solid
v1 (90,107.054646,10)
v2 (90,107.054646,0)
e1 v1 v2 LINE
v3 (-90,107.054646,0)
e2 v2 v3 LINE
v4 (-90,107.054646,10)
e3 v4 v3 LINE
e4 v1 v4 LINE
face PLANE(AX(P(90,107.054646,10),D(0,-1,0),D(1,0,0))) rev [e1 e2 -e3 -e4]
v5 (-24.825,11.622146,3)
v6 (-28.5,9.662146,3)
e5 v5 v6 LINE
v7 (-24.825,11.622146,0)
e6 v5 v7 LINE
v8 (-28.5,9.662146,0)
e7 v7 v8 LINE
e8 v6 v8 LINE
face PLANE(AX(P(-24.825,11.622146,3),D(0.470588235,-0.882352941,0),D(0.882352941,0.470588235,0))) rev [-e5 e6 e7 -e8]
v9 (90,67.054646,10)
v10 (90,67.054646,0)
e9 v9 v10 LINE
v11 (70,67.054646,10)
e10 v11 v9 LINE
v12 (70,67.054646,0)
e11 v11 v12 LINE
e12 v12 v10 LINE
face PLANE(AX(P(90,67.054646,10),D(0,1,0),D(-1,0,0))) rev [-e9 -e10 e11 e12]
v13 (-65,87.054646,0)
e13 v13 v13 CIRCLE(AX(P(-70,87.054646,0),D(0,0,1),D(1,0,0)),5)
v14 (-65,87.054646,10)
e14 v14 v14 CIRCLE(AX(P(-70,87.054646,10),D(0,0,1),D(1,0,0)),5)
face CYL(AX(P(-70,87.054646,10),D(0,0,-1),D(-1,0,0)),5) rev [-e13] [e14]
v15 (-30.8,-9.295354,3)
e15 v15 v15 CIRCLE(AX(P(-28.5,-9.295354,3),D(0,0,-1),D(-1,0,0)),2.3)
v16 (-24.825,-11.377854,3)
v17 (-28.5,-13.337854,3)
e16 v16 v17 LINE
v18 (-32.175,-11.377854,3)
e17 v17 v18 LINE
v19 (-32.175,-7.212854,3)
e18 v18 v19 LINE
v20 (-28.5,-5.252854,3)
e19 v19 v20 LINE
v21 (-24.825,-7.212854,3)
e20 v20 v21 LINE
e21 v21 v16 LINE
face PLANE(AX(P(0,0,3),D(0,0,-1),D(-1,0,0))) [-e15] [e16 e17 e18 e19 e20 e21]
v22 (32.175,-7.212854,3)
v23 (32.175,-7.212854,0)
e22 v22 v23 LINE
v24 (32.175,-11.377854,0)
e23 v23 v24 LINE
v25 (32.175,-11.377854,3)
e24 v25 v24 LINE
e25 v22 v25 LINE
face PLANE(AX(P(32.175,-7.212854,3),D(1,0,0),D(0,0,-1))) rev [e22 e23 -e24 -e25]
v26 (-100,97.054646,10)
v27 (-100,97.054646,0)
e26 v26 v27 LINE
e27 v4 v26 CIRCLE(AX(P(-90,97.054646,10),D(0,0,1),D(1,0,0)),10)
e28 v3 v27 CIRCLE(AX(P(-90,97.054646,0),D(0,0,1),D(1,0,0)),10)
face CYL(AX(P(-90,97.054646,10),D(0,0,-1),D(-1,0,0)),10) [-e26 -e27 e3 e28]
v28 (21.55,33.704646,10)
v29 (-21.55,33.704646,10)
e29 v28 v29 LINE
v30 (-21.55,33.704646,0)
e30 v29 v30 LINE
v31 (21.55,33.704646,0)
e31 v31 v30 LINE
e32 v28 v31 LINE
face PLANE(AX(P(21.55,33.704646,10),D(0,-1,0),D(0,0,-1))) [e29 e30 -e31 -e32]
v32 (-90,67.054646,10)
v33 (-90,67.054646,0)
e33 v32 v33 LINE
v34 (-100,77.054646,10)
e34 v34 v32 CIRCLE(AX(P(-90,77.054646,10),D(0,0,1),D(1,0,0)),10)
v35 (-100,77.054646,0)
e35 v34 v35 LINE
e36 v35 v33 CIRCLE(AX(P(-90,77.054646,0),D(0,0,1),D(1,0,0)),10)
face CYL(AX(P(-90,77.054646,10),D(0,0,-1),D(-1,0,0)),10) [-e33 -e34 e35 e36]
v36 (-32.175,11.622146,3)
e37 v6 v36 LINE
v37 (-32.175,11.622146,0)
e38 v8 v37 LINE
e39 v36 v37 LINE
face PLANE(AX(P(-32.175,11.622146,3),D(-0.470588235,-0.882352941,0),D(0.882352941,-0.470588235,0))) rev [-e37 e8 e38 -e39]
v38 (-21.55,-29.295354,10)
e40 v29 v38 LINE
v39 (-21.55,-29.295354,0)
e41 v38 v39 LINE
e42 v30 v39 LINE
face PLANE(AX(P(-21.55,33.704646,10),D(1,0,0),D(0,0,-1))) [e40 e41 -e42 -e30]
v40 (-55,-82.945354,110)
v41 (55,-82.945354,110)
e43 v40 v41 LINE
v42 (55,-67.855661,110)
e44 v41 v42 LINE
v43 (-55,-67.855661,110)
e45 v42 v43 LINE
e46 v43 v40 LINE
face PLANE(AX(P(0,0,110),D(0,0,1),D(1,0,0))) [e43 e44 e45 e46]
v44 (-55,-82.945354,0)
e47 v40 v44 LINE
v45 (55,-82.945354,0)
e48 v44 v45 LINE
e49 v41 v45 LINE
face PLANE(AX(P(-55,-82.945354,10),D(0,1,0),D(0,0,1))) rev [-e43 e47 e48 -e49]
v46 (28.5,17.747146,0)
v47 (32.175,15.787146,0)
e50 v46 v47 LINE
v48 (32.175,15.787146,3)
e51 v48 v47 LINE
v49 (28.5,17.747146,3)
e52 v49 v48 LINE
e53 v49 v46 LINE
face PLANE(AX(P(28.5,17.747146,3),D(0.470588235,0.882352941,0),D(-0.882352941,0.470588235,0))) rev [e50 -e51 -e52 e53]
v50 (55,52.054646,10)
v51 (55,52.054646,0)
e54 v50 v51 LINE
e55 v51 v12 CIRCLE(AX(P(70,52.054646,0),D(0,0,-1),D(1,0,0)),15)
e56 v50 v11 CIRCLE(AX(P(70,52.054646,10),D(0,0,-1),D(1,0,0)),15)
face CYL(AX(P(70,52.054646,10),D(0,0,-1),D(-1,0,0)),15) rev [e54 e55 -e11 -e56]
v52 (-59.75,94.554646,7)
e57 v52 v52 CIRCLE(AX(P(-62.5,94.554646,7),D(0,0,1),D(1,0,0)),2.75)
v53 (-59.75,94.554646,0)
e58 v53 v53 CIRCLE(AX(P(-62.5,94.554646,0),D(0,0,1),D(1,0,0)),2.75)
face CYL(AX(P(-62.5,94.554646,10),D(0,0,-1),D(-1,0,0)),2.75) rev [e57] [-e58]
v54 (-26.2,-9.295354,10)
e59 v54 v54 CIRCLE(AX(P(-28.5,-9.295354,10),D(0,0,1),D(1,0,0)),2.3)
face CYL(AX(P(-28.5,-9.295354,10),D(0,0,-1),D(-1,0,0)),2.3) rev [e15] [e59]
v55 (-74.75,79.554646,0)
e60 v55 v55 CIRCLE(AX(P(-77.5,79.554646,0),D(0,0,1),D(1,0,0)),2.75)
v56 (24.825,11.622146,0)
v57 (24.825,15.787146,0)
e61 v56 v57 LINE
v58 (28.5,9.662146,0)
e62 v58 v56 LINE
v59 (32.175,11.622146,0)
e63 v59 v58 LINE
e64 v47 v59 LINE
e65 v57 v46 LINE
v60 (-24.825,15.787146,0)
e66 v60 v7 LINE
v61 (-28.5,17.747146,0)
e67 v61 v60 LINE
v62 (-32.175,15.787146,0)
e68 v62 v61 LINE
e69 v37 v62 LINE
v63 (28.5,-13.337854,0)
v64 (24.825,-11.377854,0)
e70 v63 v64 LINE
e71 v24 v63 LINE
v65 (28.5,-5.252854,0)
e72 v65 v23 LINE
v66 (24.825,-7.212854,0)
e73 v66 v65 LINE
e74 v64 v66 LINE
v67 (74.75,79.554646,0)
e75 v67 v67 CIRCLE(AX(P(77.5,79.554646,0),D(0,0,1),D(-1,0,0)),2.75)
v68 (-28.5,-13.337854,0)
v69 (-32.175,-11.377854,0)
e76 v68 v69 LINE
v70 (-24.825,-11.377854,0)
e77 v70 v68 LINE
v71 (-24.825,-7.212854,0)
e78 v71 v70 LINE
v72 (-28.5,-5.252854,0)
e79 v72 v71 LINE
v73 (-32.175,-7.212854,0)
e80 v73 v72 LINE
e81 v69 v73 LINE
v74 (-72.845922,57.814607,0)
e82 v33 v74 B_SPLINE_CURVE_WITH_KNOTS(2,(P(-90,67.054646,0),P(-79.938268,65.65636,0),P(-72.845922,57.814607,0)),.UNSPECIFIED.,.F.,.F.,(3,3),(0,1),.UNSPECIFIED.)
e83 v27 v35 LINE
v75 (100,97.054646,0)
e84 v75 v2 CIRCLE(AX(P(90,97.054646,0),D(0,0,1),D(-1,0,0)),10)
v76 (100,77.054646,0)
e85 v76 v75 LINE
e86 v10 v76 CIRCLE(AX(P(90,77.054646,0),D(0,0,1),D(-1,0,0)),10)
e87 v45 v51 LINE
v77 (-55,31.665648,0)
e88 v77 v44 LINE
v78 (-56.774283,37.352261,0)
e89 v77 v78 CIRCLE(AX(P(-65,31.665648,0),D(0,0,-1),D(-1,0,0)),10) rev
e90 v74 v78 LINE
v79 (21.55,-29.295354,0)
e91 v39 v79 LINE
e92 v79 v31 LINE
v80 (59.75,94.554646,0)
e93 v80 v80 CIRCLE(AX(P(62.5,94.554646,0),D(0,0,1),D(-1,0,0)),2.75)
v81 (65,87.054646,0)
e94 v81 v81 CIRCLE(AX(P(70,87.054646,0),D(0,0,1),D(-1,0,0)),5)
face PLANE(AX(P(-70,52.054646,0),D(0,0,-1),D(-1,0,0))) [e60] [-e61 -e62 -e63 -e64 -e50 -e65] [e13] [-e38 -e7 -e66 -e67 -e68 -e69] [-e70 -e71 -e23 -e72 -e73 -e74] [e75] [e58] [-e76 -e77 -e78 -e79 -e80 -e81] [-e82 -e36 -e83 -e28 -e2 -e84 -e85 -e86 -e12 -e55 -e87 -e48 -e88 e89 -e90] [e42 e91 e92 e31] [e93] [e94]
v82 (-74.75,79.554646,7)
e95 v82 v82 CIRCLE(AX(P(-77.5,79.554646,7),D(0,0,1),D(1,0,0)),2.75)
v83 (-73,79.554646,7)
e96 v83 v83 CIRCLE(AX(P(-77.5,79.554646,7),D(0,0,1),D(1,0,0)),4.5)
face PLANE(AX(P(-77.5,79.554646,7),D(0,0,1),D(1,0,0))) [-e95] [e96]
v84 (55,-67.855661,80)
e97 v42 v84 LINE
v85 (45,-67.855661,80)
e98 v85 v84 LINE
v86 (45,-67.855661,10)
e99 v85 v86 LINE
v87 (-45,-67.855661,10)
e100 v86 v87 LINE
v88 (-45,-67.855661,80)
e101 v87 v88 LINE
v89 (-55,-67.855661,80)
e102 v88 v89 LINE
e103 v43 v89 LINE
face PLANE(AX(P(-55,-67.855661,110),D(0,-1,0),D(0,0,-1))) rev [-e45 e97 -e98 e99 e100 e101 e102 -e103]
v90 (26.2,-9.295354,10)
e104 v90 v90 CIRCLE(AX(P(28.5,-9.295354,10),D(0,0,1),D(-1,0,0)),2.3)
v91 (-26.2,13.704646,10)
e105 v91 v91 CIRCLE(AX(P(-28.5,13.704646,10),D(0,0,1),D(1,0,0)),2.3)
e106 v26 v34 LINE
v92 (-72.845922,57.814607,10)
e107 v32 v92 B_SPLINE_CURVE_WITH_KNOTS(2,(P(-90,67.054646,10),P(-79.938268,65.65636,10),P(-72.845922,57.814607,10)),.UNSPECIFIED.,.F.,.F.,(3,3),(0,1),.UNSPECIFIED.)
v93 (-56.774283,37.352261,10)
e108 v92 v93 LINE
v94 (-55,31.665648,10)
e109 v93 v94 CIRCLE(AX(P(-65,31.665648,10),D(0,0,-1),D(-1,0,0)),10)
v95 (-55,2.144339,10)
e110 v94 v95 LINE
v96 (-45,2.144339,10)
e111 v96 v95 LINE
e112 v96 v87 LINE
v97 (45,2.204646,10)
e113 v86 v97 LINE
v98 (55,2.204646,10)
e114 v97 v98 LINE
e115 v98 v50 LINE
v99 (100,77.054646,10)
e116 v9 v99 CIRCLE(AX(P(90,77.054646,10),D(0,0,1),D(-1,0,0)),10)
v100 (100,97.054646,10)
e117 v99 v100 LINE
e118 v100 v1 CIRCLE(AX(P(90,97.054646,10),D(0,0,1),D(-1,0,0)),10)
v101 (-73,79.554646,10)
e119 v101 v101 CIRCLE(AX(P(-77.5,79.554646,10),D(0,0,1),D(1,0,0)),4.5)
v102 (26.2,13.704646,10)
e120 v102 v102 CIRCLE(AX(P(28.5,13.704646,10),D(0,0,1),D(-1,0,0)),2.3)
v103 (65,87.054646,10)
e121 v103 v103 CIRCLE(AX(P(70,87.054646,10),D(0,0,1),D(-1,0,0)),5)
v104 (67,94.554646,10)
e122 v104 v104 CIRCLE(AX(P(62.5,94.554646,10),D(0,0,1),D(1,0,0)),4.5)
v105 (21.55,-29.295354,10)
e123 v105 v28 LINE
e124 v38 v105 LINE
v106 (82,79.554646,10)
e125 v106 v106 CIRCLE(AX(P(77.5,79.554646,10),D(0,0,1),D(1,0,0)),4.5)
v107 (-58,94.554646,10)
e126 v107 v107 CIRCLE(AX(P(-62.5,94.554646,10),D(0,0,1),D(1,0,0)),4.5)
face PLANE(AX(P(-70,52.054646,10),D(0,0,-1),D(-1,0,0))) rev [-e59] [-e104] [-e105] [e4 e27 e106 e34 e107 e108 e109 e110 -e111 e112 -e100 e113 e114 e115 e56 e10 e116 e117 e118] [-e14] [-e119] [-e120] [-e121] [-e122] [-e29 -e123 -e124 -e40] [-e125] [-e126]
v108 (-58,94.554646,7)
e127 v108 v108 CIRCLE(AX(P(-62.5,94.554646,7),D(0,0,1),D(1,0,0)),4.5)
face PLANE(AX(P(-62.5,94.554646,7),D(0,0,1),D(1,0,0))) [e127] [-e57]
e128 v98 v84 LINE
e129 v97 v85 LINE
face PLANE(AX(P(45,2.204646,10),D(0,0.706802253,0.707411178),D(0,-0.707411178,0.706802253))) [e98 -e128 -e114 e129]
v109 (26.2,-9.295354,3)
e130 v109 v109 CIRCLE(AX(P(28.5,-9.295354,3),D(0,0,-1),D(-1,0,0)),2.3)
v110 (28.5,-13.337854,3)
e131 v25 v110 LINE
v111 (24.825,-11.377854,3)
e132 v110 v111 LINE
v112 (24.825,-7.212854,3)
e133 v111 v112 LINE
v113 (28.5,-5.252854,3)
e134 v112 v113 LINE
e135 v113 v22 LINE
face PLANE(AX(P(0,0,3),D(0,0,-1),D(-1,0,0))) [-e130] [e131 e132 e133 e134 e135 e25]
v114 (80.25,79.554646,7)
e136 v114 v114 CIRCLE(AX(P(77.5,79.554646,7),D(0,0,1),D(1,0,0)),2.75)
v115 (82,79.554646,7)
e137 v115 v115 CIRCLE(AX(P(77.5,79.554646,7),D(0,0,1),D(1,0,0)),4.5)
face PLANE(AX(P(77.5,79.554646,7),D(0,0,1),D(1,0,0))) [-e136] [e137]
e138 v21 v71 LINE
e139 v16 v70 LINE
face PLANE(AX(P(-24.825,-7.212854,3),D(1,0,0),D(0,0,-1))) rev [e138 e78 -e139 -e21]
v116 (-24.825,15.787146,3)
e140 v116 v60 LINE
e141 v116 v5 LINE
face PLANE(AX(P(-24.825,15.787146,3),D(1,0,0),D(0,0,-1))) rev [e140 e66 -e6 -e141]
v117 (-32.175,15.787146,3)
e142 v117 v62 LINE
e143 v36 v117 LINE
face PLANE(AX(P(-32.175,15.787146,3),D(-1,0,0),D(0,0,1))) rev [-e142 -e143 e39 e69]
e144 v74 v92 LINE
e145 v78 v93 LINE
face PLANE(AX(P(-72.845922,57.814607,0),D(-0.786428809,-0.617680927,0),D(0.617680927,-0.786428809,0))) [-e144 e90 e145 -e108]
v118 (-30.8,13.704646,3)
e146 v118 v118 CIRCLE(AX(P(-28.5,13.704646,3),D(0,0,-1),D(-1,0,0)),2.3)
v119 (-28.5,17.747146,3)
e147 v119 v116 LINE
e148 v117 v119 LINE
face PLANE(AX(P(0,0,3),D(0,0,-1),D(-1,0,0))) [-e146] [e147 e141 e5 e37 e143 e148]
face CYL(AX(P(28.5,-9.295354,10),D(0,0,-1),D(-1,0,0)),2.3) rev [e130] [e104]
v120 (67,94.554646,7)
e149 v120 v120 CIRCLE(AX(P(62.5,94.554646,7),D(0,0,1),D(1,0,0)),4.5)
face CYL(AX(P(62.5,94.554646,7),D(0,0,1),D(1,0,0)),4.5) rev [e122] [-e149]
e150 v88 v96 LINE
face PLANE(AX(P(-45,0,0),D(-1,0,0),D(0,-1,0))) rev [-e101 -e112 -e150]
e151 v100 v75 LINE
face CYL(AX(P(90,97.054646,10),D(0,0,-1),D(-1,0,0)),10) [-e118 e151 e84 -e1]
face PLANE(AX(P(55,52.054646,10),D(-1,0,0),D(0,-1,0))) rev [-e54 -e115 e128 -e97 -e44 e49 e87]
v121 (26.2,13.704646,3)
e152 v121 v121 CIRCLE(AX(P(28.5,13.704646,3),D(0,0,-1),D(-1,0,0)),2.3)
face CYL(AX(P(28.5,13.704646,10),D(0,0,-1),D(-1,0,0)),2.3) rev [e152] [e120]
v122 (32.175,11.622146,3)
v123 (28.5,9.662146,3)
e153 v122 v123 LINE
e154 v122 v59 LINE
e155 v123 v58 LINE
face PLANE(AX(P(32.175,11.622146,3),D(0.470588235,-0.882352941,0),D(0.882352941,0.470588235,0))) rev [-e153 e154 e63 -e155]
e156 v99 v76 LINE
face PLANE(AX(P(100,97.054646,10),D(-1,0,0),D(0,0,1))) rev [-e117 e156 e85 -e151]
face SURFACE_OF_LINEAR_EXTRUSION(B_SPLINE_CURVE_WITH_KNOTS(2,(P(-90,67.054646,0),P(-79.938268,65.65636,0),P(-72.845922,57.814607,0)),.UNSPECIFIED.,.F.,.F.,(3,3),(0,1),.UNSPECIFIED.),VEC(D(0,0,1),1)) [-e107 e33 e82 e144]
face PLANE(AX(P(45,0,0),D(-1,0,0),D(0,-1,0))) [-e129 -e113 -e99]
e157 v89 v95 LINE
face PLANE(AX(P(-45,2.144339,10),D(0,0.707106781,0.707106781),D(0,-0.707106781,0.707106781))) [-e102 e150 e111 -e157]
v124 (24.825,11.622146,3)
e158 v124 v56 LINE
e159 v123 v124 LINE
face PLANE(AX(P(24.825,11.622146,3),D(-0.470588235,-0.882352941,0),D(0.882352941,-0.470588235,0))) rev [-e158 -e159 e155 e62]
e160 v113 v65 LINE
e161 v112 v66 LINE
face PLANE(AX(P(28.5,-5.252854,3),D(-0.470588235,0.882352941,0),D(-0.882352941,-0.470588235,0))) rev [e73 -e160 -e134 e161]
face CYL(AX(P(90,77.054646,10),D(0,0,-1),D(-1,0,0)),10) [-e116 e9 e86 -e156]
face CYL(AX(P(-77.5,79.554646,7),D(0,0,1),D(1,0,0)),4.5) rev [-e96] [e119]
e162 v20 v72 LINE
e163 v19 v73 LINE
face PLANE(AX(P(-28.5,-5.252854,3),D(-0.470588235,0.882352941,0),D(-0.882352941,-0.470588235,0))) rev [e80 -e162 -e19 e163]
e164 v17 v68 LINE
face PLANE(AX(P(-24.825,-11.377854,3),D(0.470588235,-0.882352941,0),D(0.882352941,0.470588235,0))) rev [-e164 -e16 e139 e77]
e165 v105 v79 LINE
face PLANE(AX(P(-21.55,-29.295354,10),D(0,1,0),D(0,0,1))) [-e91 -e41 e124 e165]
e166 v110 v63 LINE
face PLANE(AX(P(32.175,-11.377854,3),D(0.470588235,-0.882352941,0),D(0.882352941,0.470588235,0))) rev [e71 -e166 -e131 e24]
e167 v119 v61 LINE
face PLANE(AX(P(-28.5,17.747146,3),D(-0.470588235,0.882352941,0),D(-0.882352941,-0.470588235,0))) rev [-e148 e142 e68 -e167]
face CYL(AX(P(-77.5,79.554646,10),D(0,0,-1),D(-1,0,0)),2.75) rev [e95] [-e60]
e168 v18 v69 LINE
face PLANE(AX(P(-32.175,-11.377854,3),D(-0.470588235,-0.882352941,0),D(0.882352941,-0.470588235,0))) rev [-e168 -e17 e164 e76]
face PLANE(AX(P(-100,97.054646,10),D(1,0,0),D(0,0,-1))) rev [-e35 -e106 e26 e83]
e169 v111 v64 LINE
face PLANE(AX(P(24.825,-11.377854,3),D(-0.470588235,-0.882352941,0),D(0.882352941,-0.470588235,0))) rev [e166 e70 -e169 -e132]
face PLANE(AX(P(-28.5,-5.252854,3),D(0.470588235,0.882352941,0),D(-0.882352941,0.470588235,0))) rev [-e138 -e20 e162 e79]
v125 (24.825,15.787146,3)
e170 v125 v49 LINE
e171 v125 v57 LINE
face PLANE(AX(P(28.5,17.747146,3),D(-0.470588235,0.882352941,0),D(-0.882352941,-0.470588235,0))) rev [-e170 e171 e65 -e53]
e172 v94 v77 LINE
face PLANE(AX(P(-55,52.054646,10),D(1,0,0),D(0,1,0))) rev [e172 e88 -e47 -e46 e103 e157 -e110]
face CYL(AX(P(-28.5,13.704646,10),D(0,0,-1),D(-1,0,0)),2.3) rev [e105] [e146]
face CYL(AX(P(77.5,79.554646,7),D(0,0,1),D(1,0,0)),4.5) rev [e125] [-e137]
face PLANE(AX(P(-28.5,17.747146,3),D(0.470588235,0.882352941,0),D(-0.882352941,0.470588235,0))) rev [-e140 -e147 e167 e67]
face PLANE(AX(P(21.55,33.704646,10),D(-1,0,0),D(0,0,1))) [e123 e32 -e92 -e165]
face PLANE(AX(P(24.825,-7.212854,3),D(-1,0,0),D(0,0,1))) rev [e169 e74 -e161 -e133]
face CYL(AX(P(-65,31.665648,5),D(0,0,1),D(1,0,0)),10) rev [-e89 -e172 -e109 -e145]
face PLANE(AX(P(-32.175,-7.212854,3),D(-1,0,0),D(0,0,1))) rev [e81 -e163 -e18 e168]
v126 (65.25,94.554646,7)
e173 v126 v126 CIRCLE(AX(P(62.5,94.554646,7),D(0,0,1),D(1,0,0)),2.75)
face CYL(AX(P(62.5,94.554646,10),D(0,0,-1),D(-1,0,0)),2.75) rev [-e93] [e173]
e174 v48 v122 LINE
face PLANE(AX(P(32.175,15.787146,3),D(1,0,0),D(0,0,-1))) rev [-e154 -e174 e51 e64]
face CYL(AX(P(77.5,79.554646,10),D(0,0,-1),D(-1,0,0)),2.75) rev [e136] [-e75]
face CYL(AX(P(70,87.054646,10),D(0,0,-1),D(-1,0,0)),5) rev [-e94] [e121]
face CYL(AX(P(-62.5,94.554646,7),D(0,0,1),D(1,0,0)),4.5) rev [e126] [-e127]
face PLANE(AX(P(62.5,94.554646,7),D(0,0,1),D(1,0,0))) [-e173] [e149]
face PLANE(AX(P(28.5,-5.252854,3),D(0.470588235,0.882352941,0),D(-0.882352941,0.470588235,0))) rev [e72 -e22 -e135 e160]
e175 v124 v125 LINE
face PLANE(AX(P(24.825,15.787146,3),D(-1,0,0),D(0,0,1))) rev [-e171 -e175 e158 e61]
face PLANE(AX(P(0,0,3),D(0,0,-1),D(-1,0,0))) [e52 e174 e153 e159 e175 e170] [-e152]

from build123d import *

# Parameters (mm, degrees)
SKIZZE1_R                       = 2.3
SKIZZE1_R_2                     = 5
SKIZZE1_R_3                     = 2.75
SKIZZE1_W                       = 43.1
SKIZZE1_H                       = 63
AUFSATZ_LINEAR_AUSTRAGEN1_DEPTH = 10
AUFSATZ_LINEAR_AUSTRAGEN3_DEPTH = 10
SKIZZE4_W                       = 110
SKIZZE4_H                       = 15.089693508
AUFSATZ_LINEAR_AUSTRAGEN4_DEPTH = 100
VERRUNDUNG5_R                   = 10
SKIZZE11_R                      = 4.5
SCHNITT_LINEAR_AUSTRAGEN1_DEPTH = 3
SCHNITT_LINEAR_AUSTRAGEN2_DEPTH = 3
AUFSATZ_LINEAR_AUSTRAGEN7_DEPTH = 10
AUFSATZ_LINEAR_AUSTRAGEN8_DEPTH = 10


with BuildPart() as part:
    # Skizze1 → Aufsatz-Linear austragen1 (new body)
    with BuildSketch(Plane.XY):
        with BuildLine():
            Line((90, 107.054645521), (-90, 107.054645521))
            ThreePointArc((-90, 107.054645521), (-97.071067812, 104.125713333), (-100, 97.054645521))
            Line((-100, 97.054645521), (-100, 77.054645521))
            ThreePointArc((-100, 77.054645521), (-97.071067812, 69.983577709), (-90, 67.054645521))
            Line((-90, 67.054645521), (-70, 67.054645521))
            ThreePointArc((-70, 67.054645521), (-59.393398282, 62.661247239), (-55, 52.054645521))
            Line((-55, 52.054645521), (-55, -82.945354479))
            Line((-55, -82.945354479), (55, -82.945354479))
            Line((55, -82.945354479), (55, 52.054645521))
            ThreePointArc((55, 52.054645521), (59.393398282, 62.661247239), (70, 67.054645521))
            Line((70, 67.054645521), (90, 67.054645521))
            ThreePointArc((90, 67.054645521), (97.071067812, 69.983577709), (100, 77.054645521))
            Line((100, 77.054645521), (100, 97.054645521))
            ThreePointArc((100, 97.054645521), (97.071067812, 104.125713333), (90, 107.054645521))
        make_face()
        with Locations((-28.5, 13.704645521)):
            Circle(SKIZZE1_R, mode=Mode.SUBTRACT)
        with Locations((-28.5, -9.295354479)):
            Circle(SKIZZE1_R, mode=Mode.SUBTRACT)
        with Locations(Location((28.5, -9.295354479, 0), (0, 0, 180))):
            Circle(SKIZZE1_R, mode=Mode.SUBTRACT)
        with Locations(Location((28.5, 13.704645521, 0), (0, 0, 180))):
            Circle(SKIZZE1_R, mode=Mode.SUBTRACT)
        with Locations((-70, 87.054645521)):
            Circle(SKIZZE1_R_2, mode=Mode.SUBTRACT)
        with Locations((-62.5, 94.554645521)):
            Circle(SKIZZE1_R_3, mode=Mode.SUBTRACT)
        with Locations((-77.5, 79.554645521)):
            Circle(SKIZZE1_R_3, mode=Mode.SUBTRACT)
        with Locations(Location((77.5, 79.554645521, 0), (0, 0, 180))):
            Circle(SKIZZE1_R_3, mode=Mode.SUBTRACT)
        with Locations(Location((62.5, 94.554645521, 0), (0, 0, 180))):
            Circle(SKIZZE1_R_3, mode=Mode.SUBTRACT)
        with Locations(Location((70, 87.054645521, 0), (0, 0, 180))):
            Circle(SKIZZE1_R_2, mode=Mode.SUBTRACT)
        with Locations((0, 2.204645521)):
            Rectangle(SKIZZE1_W, SKIZZE1_H, mode=Mode.SUBTRACT)
    extrude(amount=AUFSATZ_LINEAR_AUSTRAGEN1_DEPTH)

    # Skizze3 → Aufsatz-Linear austragen3 (add)
    with BuildSketch(Plane.XY.offset(10)):
        with BuildLine():
            Line((-72.845922337, 57.814606503), (-56.774282723, 37.352261221))
            add(Edge.make_bspline(
                [(-55, 18.961003518), (-46.636539725, 27.963101216), (-56.774282723, 37.352261221)],
                knots=[0, 0, 0, 1, 1, 1], degree=2))
            Line((-55, 18.961003518), (-43.333440031, 21.200490786))
            Line((-43.333440031, 21.200490786), (-45.498025685, 67.054645521))
            Line((-45.498025685, 67.054645521), (-90, 67.054645521))
            add(Edge.make_bspline(
                [(-90, 67.054645521), (-79.938268155, 65.656359823), (-72.845922337, 57.814606503)],
                knots=[0, 0, 0, 1, 1, 1], degree=2))
        make_face()
    extrude(amount=-AUFSATZ_LINEAR_AUSTRAGEN3_DEPTH)

    # Skizze4 → Aufsatz-Linear austragen4 (add)
    with BuildSketch(Plane.XY.offset(10)):
        with Locations((0, -75.400507725)):
            Rectangle(SKIZZE4_W, SKIZZE4_H)
    extrude(amount=AUFSATZ_LINEAR_AUSTRAGEN4_DEPTH)

    # Verrundung5
    # the kernel refuses this fillet: 10 mm, written as the material it adds along each edge
    with BuildSketch(Plane(origin=(-55, 35.554962551, 0), x_dir=(-0.702535464065595, 0.7116487347913572, 0), z_dir=(0, 0, 1))) as verrundung5_piece_1:
        with BuildLine():
            CenterArc((4.257528526, 9.848869082), VERRUNDUNG5_R, 225.36921974, 34.65693161)
            Line((-2.767826115, 2.732381734), (-2.908333207, 2.590051987))
            Line((-2.908333207, 2.590051987), (-0.140507093, -0.142329747))
            Line((-0.140507093, -0.142329747), (-0.009856246, -0.199756988))
            ThreePointArc((-0.009856246, -0.199756988), (1.263031351, -0.229630028), (2.490902127, -0.196977382))
            Line((2.490902127, -0.196977382), (2.52554186, 0))
        make_face()
    extrude(amount=10)

    # Skizze11 → Schnitt-Linear austragen1 (cut)
    with BuildSketch(Plane.XY.offset(10)):
        with Locations((62.5, 94.554645521)):
            Circle(SKIZZE11_R)
        with Locations((77.5, 79.554645521)):
            Circle(SKIZZE11_R)
        with Locations((-62.5, 94.554645521)):
            Circle(SKIZZE11_R)
        with Locations((-77.5, 79.554645521)):
            Circle(SKIZZE11_R)
    extrude(amount=-SCHNITT_LINEAR_AUSTRAGEN1_DEPTH, mode=Mode.SUBTRACT)

    # Skizze12 → Schnitt-Linear austragen2 (cut)
    with BuildSketch(Plane(origin=(0, 0, 0), x_dir=(-1, 0, 0), z_dir=(0, 0, -1))):
        Polygon((28.5, 17.747145521), (24.825, 15.787145521), (24.825, 11.622145521), (28.5, 9.662145521), (32.175, 11.622145521), (32.175, 15.787145521), align=None)
        Polygon((28.5, -5.252854479), (24.825, -7.212854479), (24.825, -11.377854479), (28.5, -13.337854479), (32.175, -11.377854479), (32.175, -7.212854479), align=None)
        Polygon((-28.5, -5.252854479), (-32.175, -7.212854479), (-32.175, -11.377854479), (-28.5, -13.337854479), (-24.825, -11.377854479), (-24.825, -7.212854479), align=None)
        Polygon((-28.5, 17.747145521), (-32.175, 15.787145521), (-32.175, 11.622145521), (-28.5, 9.662145521), (-24.825, 11.622145521), (-24.825, 15.787145521), align=None)
    extrude(amount=-SCHNITT_LINEAR_AUSTRAGEN2_DEPTH, mode=Mode.SUBTRACT)

    # Skizze15 → Aufsatz-Linear austragen7 (add)
    with BuildSketch(Plane.ZY.offset(55)):
        Polygon((10, 2.144339029), (80, -67.855660971), (10, -67.855660971), align=None)
    extrude(amount=-AUFSATZ_LINEAR_AUSTRAGEN7_DEPTH)

    # Skizze16 → Aufsatz-Linear austragen8 (add)
    with BuildSketch(Plane(origin=(55, 0, 0), x_dir=(0, 0, -1), z_dir=(1, 0, 0))):
        Polygon((-10, 2.204645521), (-80, -67.855660971), (-10, -67.855660971), align=None)
    extrude(amount=-AUFSATZ_LINEAR_AUSTRAGEN8_DEPTH)


solid = part.part
